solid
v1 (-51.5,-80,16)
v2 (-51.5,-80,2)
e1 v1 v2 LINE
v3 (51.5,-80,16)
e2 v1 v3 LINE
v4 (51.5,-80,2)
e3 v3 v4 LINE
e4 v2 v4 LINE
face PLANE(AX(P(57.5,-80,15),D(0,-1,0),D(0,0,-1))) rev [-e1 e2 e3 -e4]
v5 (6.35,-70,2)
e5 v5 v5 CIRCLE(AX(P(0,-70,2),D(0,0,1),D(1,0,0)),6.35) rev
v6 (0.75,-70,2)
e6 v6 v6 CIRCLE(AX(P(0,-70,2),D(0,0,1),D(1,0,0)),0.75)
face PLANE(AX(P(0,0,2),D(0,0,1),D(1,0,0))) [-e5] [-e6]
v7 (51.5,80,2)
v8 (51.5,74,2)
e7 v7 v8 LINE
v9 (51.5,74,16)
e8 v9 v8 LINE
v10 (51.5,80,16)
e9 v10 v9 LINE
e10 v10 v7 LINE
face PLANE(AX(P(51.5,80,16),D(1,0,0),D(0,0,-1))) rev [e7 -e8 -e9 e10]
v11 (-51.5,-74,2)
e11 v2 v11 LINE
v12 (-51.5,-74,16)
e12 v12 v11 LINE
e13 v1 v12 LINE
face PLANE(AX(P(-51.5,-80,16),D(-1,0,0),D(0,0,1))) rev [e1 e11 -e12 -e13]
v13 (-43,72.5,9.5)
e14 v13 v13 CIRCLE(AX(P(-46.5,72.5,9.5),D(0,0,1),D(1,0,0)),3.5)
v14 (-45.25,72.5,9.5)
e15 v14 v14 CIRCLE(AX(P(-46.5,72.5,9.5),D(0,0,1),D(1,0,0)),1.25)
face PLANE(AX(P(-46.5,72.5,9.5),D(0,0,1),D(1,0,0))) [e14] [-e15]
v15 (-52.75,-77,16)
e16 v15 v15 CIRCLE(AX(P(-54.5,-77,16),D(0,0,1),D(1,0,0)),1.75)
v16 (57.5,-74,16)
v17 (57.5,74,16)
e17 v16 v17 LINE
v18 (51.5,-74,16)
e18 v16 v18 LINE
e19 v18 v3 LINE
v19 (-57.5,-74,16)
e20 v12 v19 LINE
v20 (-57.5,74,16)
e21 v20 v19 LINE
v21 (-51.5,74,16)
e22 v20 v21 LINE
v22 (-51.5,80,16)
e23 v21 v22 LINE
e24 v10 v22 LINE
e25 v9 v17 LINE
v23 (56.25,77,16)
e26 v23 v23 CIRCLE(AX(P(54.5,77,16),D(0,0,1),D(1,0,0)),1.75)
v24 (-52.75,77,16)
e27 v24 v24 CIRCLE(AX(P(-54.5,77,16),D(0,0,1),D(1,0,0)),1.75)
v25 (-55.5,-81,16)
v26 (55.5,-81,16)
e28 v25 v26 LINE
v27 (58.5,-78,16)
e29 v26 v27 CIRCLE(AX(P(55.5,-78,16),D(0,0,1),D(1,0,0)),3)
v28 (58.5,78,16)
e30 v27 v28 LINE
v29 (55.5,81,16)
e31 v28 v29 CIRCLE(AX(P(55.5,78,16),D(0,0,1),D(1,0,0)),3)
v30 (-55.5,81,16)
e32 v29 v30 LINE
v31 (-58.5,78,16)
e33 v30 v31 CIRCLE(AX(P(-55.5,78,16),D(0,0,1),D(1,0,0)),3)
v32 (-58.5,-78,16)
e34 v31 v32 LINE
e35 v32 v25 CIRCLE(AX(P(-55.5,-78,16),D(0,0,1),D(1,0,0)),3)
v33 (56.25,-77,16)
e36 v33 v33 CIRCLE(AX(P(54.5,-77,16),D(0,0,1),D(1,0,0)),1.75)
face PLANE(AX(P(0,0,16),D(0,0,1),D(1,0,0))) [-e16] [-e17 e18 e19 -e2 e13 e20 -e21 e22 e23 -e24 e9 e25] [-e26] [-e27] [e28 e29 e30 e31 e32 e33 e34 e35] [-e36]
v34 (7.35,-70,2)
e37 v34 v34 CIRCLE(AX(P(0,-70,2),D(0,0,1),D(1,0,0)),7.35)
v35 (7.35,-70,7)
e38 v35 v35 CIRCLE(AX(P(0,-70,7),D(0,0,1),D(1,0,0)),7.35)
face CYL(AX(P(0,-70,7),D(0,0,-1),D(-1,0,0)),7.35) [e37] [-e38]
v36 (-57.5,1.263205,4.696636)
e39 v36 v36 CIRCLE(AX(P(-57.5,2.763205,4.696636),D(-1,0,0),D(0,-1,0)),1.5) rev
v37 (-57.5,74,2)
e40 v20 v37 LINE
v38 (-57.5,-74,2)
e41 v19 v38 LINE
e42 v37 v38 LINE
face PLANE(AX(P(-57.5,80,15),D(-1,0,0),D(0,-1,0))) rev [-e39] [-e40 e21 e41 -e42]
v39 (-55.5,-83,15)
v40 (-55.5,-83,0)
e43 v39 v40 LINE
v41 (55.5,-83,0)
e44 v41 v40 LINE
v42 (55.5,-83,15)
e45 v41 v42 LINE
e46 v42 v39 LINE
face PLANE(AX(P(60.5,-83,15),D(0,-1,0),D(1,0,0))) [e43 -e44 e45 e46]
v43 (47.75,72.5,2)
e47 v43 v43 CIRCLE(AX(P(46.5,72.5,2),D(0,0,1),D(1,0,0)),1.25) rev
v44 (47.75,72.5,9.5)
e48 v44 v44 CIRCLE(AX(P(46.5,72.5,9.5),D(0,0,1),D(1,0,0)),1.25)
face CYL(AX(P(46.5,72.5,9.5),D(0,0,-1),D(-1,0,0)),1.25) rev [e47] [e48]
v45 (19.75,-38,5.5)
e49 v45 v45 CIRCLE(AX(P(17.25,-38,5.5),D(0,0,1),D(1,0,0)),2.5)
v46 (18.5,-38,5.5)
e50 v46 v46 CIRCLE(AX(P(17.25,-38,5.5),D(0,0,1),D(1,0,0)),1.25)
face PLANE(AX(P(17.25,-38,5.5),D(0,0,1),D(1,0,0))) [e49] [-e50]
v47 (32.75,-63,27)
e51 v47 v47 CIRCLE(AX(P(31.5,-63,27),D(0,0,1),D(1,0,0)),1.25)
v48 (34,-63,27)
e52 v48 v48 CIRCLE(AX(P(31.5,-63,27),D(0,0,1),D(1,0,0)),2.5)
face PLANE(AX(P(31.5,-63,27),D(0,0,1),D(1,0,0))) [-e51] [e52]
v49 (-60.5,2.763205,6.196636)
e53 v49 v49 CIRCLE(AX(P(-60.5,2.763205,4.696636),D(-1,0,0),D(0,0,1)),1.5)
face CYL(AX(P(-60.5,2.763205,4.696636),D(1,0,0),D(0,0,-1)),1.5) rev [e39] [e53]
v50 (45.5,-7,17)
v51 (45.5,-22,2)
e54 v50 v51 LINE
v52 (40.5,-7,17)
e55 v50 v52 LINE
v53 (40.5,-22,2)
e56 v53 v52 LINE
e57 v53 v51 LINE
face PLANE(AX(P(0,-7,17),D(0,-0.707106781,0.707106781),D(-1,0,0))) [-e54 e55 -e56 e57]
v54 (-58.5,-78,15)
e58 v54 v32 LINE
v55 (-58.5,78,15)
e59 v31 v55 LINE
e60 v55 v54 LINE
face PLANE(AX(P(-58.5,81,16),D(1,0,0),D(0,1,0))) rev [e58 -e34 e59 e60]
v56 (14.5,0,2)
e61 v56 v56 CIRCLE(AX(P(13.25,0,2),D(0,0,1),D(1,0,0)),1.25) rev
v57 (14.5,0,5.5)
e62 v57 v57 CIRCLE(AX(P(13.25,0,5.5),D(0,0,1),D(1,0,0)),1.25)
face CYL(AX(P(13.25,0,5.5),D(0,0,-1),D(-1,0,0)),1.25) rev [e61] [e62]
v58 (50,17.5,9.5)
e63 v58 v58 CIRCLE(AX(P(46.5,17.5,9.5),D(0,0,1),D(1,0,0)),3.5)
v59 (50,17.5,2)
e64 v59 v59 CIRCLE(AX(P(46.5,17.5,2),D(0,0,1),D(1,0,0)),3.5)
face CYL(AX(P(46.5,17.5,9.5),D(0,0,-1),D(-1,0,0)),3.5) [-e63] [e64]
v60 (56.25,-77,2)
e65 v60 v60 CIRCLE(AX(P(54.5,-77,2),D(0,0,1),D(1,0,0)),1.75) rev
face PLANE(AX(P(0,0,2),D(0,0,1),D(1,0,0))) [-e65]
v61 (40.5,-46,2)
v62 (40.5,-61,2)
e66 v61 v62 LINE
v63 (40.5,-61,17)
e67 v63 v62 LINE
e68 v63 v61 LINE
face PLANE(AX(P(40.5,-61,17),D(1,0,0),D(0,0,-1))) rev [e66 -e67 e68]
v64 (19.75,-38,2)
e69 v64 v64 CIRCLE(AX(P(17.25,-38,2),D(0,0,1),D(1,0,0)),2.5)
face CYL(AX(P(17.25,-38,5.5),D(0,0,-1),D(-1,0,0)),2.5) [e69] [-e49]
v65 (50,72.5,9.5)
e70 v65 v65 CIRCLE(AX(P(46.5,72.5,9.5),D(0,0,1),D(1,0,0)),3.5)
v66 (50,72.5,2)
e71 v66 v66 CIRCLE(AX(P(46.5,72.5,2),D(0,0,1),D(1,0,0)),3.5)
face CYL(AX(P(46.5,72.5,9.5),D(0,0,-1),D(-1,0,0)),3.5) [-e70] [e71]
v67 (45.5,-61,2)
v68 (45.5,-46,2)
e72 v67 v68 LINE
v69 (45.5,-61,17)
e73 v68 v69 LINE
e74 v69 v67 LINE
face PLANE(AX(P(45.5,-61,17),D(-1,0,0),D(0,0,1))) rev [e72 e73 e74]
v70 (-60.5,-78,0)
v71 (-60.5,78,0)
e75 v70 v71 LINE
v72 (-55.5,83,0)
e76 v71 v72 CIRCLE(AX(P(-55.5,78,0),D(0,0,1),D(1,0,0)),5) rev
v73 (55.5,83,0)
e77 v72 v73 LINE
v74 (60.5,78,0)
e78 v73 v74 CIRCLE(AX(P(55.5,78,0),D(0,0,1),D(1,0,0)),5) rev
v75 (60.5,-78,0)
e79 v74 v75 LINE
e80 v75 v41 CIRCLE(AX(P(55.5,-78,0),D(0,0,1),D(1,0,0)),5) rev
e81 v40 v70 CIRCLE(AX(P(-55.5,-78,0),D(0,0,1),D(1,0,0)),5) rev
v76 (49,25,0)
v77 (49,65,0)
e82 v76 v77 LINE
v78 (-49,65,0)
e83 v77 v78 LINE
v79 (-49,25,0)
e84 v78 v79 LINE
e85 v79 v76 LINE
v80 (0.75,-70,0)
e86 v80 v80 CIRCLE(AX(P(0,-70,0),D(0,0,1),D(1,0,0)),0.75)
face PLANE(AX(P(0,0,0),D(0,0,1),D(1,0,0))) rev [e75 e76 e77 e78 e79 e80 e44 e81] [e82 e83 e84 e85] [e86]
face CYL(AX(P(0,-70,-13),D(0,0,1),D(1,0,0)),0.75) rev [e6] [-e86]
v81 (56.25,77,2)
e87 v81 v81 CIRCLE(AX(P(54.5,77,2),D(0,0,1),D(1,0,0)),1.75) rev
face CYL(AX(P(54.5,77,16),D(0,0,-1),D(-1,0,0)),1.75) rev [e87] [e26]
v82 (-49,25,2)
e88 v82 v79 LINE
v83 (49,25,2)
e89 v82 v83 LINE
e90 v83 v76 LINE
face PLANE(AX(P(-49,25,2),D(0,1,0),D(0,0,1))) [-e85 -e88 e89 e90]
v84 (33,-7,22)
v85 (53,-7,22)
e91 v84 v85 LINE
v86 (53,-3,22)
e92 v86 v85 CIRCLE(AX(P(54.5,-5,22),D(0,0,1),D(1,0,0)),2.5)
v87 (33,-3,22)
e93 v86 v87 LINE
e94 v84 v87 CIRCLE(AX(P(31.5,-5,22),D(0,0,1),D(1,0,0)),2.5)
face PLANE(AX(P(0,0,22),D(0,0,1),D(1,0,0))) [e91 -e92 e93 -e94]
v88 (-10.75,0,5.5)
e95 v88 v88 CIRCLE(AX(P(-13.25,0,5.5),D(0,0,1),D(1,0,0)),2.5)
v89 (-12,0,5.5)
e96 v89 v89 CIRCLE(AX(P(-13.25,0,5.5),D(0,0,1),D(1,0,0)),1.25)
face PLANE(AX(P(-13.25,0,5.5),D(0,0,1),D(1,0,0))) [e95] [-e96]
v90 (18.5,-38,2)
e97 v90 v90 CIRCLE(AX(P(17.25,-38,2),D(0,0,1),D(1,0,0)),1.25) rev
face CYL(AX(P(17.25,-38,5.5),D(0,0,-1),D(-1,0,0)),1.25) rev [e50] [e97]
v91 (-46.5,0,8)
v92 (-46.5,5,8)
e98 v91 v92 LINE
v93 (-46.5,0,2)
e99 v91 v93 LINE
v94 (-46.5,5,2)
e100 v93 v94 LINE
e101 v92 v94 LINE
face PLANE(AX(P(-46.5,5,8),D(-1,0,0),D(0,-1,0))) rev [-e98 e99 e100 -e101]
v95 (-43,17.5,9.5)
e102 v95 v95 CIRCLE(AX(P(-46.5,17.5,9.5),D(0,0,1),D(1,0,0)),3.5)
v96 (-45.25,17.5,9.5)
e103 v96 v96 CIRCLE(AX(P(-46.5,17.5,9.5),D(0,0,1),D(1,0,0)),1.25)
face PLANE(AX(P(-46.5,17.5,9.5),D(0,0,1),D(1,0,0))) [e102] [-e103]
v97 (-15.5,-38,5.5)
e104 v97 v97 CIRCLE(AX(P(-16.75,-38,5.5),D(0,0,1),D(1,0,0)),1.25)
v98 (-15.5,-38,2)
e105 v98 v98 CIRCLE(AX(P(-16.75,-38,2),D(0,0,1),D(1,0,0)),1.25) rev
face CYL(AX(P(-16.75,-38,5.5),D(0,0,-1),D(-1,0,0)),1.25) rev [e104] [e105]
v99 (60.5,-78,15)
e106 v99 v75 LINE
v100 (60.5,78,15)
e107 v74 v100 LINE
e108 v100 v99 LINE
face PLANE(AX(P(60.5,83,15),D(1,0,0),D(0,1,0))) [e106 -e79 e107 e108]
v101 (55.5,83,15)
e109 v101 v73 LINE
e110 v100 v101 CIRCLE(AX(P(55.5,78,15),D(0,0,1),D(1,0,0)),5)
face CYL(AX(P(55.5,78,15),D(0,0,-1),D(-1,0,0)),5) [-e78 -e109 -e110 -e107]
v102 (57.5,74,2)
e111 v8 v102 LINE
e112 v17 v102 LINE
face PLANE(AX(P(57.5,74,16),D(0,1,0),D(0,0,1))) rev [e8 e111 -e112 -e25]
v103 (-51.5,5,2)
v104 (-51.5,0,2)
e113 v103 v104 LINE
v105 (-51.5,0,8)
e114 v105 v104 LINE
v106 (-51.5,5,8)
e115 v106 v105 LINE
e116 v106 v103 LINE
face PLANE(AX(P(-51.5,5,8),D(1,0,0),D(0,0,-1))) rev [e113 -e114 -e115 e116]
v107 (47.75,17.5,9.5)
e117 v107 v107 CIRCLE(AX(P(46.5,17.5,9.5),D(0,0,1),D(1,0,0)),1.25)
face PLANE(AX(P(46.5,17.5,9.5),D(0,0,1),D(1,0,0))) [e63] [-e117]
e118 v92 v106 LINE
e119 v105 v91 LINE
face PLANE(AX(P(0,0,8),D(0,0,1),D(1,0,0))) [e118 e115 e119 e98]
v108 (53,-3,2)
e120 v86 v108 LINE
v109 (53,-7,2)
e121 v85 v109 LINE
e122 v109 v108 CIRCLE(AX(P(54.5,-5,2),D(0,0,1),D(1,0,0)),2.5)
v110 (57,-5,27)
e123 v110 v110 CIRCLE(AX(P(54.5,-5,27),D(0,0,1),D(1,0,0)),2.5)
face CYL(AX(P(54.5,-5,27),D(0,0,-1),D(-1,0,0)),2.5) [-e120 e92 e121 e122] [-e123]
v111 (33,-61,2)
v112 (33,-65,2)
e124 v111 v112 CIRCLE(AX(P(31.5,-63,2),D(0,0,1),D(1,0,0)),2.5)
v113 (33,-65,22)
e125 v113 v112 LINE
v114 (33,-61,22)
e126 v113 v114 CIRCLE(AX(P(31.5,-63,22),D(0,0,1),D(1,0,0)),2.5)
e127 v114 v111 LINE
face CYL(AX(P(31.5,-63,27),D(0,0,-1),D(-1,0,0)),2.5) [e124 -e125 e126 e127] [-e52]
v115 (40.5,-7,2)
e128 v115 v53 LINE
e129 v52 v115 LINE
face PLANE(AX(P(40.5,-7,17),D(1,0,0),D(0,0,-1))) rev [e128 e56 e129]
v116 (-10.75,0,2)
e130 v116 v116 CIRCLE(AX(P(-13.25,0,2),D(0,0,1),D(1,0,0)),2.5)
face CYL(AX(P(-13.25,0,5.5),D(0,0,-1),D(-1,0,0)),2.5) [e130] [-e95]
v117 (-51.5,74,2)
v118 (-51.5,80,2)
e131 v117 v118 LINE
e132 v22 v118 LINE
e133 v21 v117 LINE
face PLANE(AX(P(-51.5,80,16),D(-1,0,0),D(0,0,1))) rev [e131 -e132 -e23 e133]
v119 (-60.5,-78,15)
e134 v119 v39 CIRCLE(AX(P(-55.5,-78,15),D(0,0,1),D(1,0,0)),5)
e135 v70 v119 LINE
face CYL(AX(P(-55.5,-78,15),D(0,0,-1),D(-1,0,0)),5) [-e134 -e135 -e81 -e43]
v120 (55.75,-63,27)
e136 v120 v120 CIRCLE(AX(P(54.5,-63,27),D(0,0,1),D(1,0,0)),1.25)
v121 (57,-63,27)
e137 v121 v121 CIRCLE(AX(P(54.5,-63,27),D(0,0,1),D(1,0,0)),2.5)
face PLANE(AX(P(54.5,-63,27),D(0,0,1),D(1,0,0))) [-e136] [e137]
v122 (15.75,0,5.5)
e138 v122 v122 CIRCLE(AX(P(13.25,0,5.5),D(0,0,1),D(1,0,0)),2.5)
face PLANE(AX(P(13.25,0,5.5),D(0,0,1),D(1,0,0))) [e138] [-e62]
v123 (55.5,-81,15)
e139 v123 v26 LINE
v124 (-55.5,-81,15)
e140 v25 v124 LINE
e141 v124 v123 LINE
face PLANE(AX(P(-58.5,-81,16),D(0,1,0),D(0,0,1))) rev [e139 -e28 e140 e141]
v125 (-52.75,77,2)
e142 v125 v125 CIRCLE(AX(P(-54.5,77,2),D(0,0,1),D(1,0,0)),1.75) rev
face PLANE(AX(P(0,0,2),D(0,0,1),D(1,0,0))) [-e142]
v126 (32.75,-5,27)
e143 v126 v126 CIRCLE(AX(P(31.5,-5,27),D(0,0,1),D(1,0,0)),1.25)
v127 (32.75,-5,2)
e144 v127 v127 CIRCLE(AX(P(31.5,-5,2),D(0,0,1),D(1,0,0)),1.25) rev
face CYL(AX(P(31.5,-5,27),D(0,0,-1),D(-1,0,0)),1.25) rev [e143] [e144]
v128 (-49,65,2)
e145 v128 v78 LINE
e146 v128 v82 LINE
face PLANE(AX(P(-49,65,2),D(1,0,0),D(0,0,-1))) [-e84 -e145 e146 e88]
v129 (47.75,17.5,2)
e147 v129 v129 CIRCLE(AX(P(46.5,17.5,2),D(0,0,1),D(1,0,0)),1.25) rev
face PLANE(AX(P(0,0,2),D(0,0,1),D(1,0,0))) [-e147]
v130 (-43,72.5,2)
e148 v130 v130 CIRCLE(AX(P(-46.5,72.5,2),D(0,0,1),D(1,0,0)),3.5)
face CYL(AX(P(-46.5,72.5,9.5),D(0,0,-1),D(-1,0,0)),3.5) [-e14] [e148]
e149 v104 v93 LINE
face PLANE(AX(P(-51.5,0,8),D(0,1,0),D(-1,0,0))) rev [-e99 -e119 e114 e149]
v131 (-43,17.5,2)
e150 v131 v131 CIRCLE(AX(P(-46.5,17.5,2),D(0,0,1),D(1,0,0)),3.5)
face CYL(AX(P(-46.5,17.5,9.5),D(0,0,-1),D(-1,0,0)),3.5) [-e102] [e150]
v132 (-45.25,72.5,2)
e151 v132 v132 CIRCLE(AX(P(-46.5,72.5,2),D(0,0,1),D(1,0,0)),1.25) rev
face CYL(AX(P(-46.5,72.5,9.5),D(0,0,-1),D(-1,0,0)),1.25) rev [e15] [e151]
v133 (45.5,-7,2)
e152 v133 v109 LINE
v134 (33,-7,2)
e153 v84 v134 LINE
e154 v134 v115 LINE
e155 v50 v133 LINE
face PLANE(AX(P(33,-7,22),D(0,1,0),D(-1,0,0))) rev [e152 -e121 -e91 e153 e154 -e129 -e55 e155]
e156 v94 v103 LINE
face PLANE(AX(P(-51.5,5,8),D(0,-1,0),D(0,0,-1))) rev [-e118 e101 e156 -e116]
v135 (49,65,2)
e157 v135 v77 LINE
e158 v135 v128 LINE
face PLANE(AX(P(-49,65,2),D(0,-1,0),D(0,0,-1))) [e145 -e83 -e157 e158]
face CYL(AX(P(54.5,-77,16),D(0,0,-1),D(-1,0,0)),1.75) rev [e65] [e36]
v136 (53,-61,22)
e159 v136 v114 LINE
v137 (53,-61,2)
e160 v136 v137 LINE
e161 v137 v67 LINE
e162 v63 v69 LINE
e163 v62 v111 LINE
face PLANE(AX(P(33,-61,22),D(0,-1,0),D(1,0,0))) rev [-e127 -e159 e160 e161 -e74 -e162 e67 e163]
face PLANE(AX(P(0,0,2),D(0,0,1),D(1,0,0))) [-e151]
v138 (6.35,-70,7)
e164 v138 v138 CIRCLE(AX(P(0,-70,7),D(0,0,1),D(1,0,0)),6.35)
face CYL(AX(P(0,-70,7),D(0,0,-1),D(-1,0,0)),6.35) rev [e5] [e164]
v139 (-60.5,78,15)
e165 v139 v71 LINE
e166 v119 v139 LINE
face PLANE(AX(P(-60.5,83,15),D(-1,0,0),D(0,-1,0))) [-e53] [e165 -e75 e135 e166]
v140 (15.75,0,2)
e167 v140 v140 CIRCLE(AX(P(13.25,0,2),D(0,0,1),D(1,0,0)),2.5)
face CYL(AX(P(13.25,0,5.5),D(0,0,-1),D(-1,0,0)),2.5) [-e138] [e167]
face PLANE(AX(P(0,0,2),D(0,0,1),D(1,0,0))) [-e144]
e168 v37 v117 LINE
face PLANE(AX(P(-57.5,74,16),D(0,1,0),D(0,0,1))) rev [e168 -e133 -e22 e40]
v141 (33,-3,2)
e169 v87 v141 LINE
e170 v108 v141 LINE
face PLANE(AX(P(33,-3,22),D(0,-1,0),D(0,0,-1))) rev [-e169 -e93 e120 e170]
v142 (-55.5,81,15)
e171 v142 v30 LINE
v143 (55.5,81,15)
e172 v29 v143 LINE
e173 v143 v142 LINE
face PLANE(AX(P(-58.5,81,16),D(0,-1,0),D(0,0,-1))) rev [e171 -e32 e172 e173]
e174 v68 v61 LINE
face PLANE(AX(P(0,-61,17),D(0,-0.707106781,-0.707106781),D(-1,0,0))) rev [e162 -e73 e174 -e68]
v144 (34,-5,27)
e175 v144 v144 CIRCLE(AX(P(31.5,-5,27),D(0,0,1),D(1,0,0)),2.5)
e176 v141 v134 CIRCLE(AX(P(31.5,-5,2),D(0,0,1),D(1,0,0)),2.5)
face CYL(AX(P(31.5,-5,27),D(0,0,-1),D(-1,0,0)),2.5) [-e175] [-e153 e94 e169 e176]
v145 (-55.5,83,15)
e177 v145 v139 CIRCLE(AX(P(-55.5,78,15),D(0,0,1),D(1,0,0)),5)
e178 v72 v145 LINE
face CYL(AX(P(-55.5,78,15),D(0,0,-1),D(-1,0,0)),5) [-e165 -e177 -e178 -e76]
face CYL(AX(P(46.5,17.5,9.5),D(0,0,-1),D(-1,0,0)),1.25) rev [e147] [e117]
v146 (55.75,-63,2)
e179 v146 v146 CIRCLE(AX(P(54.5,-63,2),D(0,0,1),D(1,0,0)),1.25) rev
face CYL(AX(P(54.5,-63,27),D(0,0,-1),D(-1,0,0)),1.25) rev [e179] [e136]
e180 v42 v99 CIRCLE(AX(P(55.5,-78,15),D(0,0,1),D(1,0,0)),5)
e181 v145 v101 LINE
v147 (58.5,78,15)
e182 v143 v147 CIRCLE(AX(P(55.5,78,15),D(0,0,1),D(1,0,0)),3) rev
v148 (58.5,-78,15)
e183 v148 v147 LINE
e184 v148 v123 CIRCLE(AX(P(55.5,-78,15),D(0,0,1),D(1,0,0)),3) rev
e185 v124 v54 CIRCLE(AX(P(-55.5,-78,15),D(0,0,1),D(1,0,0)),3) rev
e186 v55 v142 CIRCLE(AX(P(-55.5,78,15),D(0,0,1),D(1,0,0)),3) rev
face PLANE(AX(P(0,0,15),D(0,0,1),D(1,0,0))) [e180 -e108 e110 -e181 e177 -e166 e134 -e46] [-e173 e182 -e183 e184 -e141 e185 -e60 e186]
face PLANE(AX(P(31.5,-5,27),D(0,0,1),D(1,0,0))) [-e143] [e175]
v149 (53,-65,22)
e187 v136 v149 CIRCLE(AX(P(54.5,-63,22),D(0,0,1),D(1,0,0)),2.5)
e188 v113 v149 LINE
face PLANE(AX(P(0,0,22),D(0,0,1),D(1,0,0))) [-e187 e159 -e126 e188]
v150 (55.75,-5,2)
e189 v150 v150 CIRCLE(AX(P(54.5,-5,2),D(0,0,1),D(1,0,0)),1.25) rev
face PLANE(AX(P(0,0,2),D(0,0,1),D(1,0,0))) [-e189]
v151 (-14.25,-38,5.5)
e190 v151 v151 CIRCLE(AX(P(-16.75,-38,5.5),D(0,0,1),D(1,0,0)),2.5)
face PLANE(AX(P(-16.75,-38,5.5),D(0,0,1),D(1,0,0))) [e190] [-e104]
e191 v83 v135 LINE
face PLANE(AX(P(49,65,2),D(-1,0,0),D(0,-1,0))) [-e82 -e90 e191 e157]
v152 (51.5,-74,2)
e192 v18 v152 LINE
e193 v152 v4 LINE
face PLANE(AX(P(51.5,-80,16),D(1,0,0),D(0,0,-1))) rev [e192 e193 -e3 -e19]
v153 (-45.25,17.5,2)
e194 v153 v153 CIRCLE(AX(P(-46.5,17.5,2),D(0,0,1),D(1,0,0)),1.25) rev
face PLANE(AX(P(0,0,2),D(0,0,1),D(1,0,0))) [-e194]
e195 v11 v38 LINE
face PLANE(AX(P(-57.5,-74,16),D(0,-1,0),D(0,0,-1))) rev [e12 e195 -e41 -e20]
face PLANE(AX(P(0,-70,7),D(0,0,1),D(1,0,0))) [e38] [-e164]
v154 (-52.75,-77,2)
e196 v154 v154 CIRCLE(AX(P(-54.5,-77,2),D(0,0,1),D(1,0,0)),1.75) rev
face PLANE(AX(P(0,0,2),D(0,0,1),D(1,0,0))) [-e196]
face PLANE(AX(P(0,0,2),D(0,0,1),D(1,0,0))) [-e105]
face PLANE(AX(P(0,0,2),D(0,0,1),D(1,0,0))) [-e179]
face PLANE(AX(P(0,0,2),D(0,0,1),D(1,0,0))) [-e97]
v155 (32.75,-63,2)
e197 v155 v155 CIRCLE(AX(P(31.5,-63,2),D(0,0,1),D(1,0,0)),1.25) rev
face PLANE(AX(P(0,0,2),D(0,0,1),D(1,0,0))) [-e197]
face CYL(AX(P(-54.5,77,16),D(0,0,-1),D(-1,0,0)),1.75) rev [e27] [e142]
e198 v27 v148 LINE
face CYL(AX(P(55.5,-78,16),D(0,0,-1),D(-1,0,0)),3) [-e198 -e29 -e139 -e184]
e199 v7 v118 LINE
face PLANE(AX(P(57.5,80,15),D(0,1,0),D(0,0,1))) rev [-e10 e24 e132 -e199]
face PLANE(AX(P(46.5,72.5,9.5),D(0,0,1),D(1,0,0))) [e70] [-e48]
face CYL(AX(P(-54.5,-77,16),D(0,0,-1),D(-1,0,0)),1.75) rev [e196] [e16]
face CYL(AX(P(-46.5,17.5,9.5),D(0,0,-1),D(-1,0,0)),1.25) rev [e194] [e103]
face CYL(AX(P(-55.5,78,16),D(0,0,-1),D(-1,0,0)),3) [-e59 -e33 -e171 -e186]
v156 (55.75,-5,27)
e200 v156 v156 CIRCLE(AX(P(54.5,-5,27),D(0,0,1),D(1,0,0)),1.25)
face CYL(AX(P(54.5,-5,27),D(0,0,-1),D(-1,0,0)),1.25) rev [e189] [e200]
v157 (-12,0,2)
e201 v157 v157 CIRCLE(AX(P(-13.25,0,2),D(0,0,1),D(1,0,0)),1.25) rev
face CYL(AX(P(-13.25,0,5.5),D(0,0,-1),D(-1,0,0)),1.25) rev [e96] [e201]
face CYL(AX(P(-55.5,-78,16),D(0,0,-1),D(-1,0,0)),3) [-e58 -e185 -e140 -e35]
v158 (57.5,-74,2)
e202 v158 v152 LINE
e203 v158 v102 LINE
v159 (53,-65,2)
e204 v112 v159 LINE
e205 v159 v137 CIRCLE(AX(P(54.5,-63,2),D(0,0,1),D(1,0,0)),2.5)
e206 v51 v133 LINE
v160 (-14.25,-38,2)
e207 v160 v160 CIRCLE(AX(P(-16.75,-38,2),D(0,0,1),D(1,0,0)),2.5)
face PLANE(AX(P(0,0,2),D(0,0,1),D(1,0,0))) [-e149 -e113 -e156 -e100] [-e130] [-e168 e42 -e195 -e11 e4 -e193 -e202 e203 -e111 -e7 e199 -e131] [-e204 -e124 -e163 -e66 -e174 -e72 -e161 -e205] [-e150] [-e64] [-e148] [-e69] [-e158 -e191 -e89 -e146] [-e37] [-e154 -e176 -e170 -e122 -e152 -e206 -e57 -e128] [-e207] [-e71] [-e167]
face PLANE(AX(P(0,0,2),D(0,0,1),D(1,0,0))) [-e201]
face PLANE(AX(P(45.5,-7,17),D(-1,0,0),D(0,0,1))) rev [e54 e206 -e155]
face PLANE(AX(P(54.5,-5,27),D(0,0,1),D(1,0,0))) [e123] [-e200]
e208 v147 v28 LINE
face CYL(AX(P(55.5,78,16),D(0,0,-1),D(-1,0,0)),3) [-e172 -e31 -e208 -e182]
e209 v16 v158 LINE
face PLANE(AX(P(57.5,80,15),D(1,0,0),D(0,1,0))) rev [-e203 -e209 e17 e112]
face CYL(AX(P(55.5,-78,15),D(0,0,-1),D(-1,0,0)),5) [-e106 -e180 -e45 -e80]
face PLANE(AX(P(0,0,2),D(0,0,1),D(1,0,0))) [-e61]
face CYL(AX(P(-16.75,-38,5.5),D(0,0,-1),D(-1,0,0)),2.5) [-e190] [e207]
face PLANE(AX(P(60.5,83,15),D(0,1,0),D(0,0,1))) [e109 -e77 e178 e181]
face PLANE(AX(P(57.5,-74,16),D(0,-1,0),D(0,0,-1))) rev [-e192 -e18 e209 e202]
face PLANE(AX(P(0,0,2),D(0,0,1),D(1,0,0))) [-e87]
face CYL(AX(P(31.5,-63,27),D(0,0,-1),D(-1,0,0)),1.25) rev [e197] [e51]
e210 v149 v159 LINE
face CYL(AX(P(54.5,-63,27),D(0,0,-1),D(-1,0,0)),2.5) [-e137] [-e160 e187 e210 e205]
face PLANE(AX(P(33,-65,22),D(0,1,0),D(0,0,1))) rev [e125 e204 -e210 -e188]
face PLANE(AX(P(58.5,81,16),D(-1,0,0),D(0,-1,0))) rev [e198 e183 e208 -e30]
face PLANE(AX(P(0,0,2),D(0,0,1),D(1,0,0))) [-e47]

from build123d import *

# Parameters (mm, degrees)
SCHIZZO1_W                    = 115
SCHIZZO1_H                    = 160
SCHIZZO1_W_2                  = 98
SCHIZZO1_H_2                  = 40
ESTRUSIONE_ESTRUSIONE1_DEPTH  = 2
SCHIZZO2_R                    = 3.5
SCHIZZO2_R_2                  = 1.25
ESTRUSIONE_ESTRUSIONE2_DEPTH  = 7.5
SCHIZZO3_R                    = 2.5
SCHIZZO3_R_2                  = 1.25
ESTRUSIONE_ESTRUSIONE3_DEPTH  = 3.5
SCHIZZO4_W                    = 121
SCHIZZO4_H                    = 166
SCHIZZO4_W_2                  = 115
SCHIZZO4_H_2                  = 160
ESTRUSIONE_ESTRUSIONE4_DEPTH  = 15
SCHIZZO5_W                    = 117
SCHIZZO5_H                    = 162
SCHIZZO5_W_2                  = 115
SCHIZZO5_H_2                  = 160
ESTRUSIONE_ESTRUSIONE5_DEPTH  = 1
RACCORDO2_R                   = 5
RACCORDO3_R                   = 3
SCHIZZO6_W                    = 6
SCHIZZO6_H                    = 6
SCHIZZO6_R                    = 1.75
ESTRUSIONE_ESTRUSIONE6_DEPTH  = 14
SCHIZZO7_R                    = 2.5
SCHIZZO7_R_2                  = 1.25
ESTRUSIONE_ESTRUSIONE7_DEPTH  = 25
SCHIZZO8_W                    = 20
SCHIZZO8_H                    = 4
ESTRUSIONE_ESTRUSIONE8_DEPTH  = 20
SCHIZZO9_W                    = 5
SCHIZZO9_H                    = 15
ESTRUSIONE_ESTRUSIONE9_DEPTH  = 15
SMUSSO1_SIZE                  = 15
SCHIZZO10_R                   = 0.75
TAGLIO_ESTRUSIONE1_DEPTH      = 15
SCHIZZO11_R                   = 7.35
SCHIZZO11_R_2                 = 6.35
ESTRUSIONE_ESTRUSIONE10_DEPTH = 5
SCHIZZO12_W                   = 5
SCHIZZO12_H                   = 5
ESTRUSIONE_ESTRUSIONE11_DEPTH = 6
SCHIZZO13_R                   = 1.5
TAGLIO_ESTRUSIONE2_DEPTH      = 142.992957572


with BuildPart() as part:
    # Schizzo1 → Estrusione-Estrusione1 (new body)
    with BuildSketch(Plane.XY):
        Rectangle(SCHIZZO1_W, SCHIZZO1_H)
        with Locations((0, 45)):
            Rectangle(SCHIZZO1_W_2, SCHIZZO1_H_2, mode=Mode.SUBTRACT)
    extrude(amount=ESTRUSIONE_ESTRUSIONE1_DEPTH)

    # Schizzo2 → Estrusione-Estrusione2 (add)
    # profile 1 of 4: a face of its own
    with BuildSketch(Plane.XY.offset(2)):
        with Locations((-46.5, 72.5)):
            Circle(SCHIZZO2_R)
        with Locations((-46.5, 72.5)):
            Circle(SCHIZZO2_R_2, mode=Mode.SUBTRACT)
    # profile 2 of 4: a face of its own
    with BuildSketch(Plane.XY.offset(2)):
        with Locations((-46.5, 17.5)):
            Circle(SCHIZZO2_R)
        with Locations((-46.5, 17.5)):
            Circle(SCHIZZO2_R_2, mode=Mode.SUBTRACT)
    # profile 3 of 4: a face of its own
    with BuildSketch(Plane.XY.offset(2)):
        with Locations((46.5, 17.5)):
            Circle(SCHIZZO2_R)
        with Locations((46.5, 17.5)):
            Circle(SCHIZZO2_R_2, mode=Mode.SUBTRACT)
    # profile 4 of 4: a face of its own
    with BuildSketch(Plane.XY.offset(2)):
        with Locations((46.5, 72.5)):
            Circle(SCHIZZO2_R)
        with Locations((46.5, 72.5)):
            Circle(SCHIZZO2_R_2, mode=Mode.SUBTRACT)
    extrude(amount=ESTRUSIONE_ESTRUSIONE2_DEPTH)

    # Schizzo3 → Estrusione-Estrusione3 (add)
    # profile 1 of 4: a face of its own
    with BuildSketch(Plane.XY.offset(2)):
        with Locations((-13.25, 0)):
            Circle(SCHIZZO3_R)
        with Locations((-13.25, 0)):
            Circle(SCHIZZO3_R_2, mode=Mode.SUBTRACT)
    # profile 2 of 4: a face of its own
    with BuildSketch(Plane.XY.offset(2)):
        with Locations((13.25, 0)):
            Circle(SCHIZZO3_R)
        with Locations((13.25, 0)):
            Circle(SCHIZZO3_R_2, mode=Mode.SUBTRACT)
    # profile 3 of 4: a face of its own
    with BuildSketch(Plane.XY.offset(2)):
        with Locations((17.25, -38)):
            Circle(SCHIZZO3_R)
        with Locations((17.25, -38)):
            Circle(SCHIZZO3_R_2, mode=Mode.SUBTRACT)
    # profile 4 of 4: a face of its own
    with BuildSketch(Plane.XY.offset(2)):
        with Locations((-16.75, -38)):
            Circle(SCHIZZO3_R)
        with Locations((-16.75, -38)):
            Circle(SCHIZZO3_R_2, mode=Mode.SUBTRACT)
    extrude(amount=ESTRUSIONE_ESTRUSIONE3_DEPTH)

    # Schizzo4 → Estrusione-Estrusione4 (add)
    with BuildSketch(Plane(origin=(0, 0, 0), x_dir=(-1, 0, 0), z_dir=(0, 0, -1))):
        Rectangle(SCHIZZO4_W, SCHIZZO4_H)
        Rectangle(SCHIZZO4_W_2, SCHIZZO4_H_2, mode=Mode.SUBTRACT)
    extrude(amount=-ESTRUSIONE_ESTRUSIONE4_DEPTH)

    # Schizzo5 → Estrusione-Estrusione5 (add)
    with BuildSketch(Plane.XY.offset(15)):
        Rectangle(SCHIZZO5_W, SCHIZZO5_H)
        Rectangle(SCHIZZO5_W_2, SCHIZZO5_H_2, mode=Mode.SUBTRACT)
    extrude(amount=ESTRUSIONE_ESTRUSIONE5_DEPTH)

    # Raccordo2
    raccordo2_edges = [part.edges().sort_by_distance(p)[0] for p in [
        (60.5, 83, 7.5),
        (-60.5, 83, 7.5),
        (-60.5, -83, 7.5),
        (60.5, -83, 7.5),
    ]]
    fillet(raccordo2_edges, radius=RACCORDO2_R)

    # Raccordo3
    raccordo3_edges = [part.edges().sort_by_distance(p)[0] for p in [
        (-58.5, 81, 15.5),
        (-58.5, -81, 15.5),
        (58.5, -81, 15.5),
        (58.5, 81, 15.5),
    ]]
    fillet(raccordo3_edges, radius=RACCORDO3_R)

    # Schizzo6 → Estrusione-Estrusione6 (add)
    # profile 1 of 4: a face of its own
    with BuildSketch(Plane.XY.offset(2)):
        with Locations((-54.5, 77)):
            Rectangle(SCHIZZO6_W, SCHIZZO6_H)
        with Locations((-54.5, 77)):
            Circle(SCHIZZO6_R, mode=Mode.SUBTRACT)
    # profile 2 of 4: a face of its own
    with BuildSketch(Plane.XY.offset(2)):
        with Locations((54.5, 77)):
            Rectangle(SCHIZZO6_W, SCHIZZO6_H)
        with Locations((54.5, 77)):
            Circle(SCHIZZO6_R, mode=Mode.SUBTRACT)
    # profile 3 of 4: a face of its own
    with BuildSketch(Plane.XY.offset(2)):
        with Locations((-54.5, -77)):
            Rectangle(SCHIZZO6_W, SCHIZZO6_H)
        with Locations((-54.5, -77)):
            Circle(SCHIZZO6_R, mode=Mode.SUBTRACT)
    # profile 4 of 4: a face of its own
    with BuildSketch(Plane.XY.offset(2)):
        with Locations((54.5, -77)):
            Rectangle(SCHIZZO6_W, SCHIZZO6_H)
        with Locations((54.5, -77)):
            Circle(SCHIZZO6_R, mode=Mode.SUBTRACT)
    extrude(amount=ESTRUSIONE_ESTRUSIONE6_DEPTH)

    # Schizzo7 → Estrusione-Estrusione7 (add)
    # profile 1 of 4: a face of its own
    with BuildSketch(Plane.XY.offset(2)):
        with Locations((54.5, -5)):
            Circle(SCHIZZO7_R)
        with Locations((54.5, -5)):
            Circle(SCHIZZO7_R_2, mode=Mode.SUBTRACT)
    # profile 2 of 4: a face of its own
    with BuildSketch(Plane.XY.offset(2)):
        with Locations((31.5, -5)):
            Circle(SCHIZZO7_R)
        with Locations((31.5, -5)):
            Circle(SCHIZZO7_R_2, mode=Mode.SUBTRACT)
    # profile 3 of 4: a face of its own
    with BuildSketch(Plane.XY.offset(2)):
        with Locations((31.5, -63)):
            Circle(SCHIZZO7_R)
        with Locations((31.5, -63)):
            Circle(SCHIZZO7_R_2, mode=Mode.SUBTRACT)
    # profile 4 of 4: a face of its own
    with BuildSketch(Plane.XY.offset(2)):
        with Locations((54.5, -63)):
            Circle(SCHIZZO7_R)
        with Locations((54.5, -63)):
            Circle(SCHIZZO7_R_2, mode=Mode.SUBTRACT)
    extrude(amount=ESTRUSIONE_ESTRUSIONE7_DEPTH)

    # Schizzo8 → Estrusione-Estrusione8 (add)
    with BuildSketch(Plane.XY.offset(2)):
        with Locations((43, -5)):
            Rectangle(SCHIZZO8_W, SCHIZZO8_H)
        with Locations((43, -63)):
            Rectangle(SCHIZZO8_W, SCHIZZO8_H)
    extrude(amount=ESTRUSIONE_ESTRUSIONE8_DEPTH)

    # Schizzo9 → Estrusione-Estrusione9 (add)
    with BuildSketch(Plane.XY.offset(2)):
        with Locations((43, -14.5)):
            Rectangle(SCHIZZO9_W, SCHIZZO9_H)
        with Locations((43, -53.5)):
            Rectangle(SCHIZZO9_W, SCHIZZO9_H)
    extrude(amount=ESTRUSIONE_ESTRUSIONE9_DEPTH)

    # Smusso1
    smusso1_edges = [part.edges().sort_by_distance(p)[0] for p in [
        (43, -46, 17),
        (43, -22, 17),
    ]]
    chamfer(smusso1_edges, length=SMUSSO1_SIZE - 0.0001)  # a hair under: the kernel refuses the full size

    # Schizzo10 → Taglio-Estrusione1 (cut)
    with BuildSketch(Plane.XY.offset(2)):
        with Locations((0, -70)):
            Circle(SCHIZZO10_R)
    extrude(amount=-TAGLIO_ESTRUSIONE1_DEPTH, mode=Mode.SUBTRACT)

    # Schizzo11 → Estrusione-Estrusione10 (add)
    with BuildSketch(Plane.XY.offset(2)):
        with Locations((0, -70)):
            Circle(SCHIZZO11_R)
        with Locations((0, -70)):
            Circle(SCHIZZO11_R_2, mode=Mode.SUBTRACT)
    extrude(amount=ESTRUSIONE_ESTRUSIONE10_DEPTH)

    # Schizzo12 → Estrusione-Estrusione11 (add)
    with BuildSketch(Plane.XY.offset(2)):
        with Locations((-49, 2.5)):
            Rectangle(SCHIZZO12_W, SCHIZZO12_H)
    extrude(amount=ESTRUSIONE_ESTRUSIONE11_DEPTH)

    # Schizzo13 → Taglio-Estrusione2 (cut, through all)
    with BuildSketch(Plane.ZY.offset(51.5)):
        with Locations(Location((4.696636297, 2.763205457, 0), (0, 0, 270))):
            Circle(SCHIZZO13_R)
    extrude(amount=TAGLIO_ESTRUSIONE2_DEPTH, mode=Mode.SUBTRACT)


solid = part.part
